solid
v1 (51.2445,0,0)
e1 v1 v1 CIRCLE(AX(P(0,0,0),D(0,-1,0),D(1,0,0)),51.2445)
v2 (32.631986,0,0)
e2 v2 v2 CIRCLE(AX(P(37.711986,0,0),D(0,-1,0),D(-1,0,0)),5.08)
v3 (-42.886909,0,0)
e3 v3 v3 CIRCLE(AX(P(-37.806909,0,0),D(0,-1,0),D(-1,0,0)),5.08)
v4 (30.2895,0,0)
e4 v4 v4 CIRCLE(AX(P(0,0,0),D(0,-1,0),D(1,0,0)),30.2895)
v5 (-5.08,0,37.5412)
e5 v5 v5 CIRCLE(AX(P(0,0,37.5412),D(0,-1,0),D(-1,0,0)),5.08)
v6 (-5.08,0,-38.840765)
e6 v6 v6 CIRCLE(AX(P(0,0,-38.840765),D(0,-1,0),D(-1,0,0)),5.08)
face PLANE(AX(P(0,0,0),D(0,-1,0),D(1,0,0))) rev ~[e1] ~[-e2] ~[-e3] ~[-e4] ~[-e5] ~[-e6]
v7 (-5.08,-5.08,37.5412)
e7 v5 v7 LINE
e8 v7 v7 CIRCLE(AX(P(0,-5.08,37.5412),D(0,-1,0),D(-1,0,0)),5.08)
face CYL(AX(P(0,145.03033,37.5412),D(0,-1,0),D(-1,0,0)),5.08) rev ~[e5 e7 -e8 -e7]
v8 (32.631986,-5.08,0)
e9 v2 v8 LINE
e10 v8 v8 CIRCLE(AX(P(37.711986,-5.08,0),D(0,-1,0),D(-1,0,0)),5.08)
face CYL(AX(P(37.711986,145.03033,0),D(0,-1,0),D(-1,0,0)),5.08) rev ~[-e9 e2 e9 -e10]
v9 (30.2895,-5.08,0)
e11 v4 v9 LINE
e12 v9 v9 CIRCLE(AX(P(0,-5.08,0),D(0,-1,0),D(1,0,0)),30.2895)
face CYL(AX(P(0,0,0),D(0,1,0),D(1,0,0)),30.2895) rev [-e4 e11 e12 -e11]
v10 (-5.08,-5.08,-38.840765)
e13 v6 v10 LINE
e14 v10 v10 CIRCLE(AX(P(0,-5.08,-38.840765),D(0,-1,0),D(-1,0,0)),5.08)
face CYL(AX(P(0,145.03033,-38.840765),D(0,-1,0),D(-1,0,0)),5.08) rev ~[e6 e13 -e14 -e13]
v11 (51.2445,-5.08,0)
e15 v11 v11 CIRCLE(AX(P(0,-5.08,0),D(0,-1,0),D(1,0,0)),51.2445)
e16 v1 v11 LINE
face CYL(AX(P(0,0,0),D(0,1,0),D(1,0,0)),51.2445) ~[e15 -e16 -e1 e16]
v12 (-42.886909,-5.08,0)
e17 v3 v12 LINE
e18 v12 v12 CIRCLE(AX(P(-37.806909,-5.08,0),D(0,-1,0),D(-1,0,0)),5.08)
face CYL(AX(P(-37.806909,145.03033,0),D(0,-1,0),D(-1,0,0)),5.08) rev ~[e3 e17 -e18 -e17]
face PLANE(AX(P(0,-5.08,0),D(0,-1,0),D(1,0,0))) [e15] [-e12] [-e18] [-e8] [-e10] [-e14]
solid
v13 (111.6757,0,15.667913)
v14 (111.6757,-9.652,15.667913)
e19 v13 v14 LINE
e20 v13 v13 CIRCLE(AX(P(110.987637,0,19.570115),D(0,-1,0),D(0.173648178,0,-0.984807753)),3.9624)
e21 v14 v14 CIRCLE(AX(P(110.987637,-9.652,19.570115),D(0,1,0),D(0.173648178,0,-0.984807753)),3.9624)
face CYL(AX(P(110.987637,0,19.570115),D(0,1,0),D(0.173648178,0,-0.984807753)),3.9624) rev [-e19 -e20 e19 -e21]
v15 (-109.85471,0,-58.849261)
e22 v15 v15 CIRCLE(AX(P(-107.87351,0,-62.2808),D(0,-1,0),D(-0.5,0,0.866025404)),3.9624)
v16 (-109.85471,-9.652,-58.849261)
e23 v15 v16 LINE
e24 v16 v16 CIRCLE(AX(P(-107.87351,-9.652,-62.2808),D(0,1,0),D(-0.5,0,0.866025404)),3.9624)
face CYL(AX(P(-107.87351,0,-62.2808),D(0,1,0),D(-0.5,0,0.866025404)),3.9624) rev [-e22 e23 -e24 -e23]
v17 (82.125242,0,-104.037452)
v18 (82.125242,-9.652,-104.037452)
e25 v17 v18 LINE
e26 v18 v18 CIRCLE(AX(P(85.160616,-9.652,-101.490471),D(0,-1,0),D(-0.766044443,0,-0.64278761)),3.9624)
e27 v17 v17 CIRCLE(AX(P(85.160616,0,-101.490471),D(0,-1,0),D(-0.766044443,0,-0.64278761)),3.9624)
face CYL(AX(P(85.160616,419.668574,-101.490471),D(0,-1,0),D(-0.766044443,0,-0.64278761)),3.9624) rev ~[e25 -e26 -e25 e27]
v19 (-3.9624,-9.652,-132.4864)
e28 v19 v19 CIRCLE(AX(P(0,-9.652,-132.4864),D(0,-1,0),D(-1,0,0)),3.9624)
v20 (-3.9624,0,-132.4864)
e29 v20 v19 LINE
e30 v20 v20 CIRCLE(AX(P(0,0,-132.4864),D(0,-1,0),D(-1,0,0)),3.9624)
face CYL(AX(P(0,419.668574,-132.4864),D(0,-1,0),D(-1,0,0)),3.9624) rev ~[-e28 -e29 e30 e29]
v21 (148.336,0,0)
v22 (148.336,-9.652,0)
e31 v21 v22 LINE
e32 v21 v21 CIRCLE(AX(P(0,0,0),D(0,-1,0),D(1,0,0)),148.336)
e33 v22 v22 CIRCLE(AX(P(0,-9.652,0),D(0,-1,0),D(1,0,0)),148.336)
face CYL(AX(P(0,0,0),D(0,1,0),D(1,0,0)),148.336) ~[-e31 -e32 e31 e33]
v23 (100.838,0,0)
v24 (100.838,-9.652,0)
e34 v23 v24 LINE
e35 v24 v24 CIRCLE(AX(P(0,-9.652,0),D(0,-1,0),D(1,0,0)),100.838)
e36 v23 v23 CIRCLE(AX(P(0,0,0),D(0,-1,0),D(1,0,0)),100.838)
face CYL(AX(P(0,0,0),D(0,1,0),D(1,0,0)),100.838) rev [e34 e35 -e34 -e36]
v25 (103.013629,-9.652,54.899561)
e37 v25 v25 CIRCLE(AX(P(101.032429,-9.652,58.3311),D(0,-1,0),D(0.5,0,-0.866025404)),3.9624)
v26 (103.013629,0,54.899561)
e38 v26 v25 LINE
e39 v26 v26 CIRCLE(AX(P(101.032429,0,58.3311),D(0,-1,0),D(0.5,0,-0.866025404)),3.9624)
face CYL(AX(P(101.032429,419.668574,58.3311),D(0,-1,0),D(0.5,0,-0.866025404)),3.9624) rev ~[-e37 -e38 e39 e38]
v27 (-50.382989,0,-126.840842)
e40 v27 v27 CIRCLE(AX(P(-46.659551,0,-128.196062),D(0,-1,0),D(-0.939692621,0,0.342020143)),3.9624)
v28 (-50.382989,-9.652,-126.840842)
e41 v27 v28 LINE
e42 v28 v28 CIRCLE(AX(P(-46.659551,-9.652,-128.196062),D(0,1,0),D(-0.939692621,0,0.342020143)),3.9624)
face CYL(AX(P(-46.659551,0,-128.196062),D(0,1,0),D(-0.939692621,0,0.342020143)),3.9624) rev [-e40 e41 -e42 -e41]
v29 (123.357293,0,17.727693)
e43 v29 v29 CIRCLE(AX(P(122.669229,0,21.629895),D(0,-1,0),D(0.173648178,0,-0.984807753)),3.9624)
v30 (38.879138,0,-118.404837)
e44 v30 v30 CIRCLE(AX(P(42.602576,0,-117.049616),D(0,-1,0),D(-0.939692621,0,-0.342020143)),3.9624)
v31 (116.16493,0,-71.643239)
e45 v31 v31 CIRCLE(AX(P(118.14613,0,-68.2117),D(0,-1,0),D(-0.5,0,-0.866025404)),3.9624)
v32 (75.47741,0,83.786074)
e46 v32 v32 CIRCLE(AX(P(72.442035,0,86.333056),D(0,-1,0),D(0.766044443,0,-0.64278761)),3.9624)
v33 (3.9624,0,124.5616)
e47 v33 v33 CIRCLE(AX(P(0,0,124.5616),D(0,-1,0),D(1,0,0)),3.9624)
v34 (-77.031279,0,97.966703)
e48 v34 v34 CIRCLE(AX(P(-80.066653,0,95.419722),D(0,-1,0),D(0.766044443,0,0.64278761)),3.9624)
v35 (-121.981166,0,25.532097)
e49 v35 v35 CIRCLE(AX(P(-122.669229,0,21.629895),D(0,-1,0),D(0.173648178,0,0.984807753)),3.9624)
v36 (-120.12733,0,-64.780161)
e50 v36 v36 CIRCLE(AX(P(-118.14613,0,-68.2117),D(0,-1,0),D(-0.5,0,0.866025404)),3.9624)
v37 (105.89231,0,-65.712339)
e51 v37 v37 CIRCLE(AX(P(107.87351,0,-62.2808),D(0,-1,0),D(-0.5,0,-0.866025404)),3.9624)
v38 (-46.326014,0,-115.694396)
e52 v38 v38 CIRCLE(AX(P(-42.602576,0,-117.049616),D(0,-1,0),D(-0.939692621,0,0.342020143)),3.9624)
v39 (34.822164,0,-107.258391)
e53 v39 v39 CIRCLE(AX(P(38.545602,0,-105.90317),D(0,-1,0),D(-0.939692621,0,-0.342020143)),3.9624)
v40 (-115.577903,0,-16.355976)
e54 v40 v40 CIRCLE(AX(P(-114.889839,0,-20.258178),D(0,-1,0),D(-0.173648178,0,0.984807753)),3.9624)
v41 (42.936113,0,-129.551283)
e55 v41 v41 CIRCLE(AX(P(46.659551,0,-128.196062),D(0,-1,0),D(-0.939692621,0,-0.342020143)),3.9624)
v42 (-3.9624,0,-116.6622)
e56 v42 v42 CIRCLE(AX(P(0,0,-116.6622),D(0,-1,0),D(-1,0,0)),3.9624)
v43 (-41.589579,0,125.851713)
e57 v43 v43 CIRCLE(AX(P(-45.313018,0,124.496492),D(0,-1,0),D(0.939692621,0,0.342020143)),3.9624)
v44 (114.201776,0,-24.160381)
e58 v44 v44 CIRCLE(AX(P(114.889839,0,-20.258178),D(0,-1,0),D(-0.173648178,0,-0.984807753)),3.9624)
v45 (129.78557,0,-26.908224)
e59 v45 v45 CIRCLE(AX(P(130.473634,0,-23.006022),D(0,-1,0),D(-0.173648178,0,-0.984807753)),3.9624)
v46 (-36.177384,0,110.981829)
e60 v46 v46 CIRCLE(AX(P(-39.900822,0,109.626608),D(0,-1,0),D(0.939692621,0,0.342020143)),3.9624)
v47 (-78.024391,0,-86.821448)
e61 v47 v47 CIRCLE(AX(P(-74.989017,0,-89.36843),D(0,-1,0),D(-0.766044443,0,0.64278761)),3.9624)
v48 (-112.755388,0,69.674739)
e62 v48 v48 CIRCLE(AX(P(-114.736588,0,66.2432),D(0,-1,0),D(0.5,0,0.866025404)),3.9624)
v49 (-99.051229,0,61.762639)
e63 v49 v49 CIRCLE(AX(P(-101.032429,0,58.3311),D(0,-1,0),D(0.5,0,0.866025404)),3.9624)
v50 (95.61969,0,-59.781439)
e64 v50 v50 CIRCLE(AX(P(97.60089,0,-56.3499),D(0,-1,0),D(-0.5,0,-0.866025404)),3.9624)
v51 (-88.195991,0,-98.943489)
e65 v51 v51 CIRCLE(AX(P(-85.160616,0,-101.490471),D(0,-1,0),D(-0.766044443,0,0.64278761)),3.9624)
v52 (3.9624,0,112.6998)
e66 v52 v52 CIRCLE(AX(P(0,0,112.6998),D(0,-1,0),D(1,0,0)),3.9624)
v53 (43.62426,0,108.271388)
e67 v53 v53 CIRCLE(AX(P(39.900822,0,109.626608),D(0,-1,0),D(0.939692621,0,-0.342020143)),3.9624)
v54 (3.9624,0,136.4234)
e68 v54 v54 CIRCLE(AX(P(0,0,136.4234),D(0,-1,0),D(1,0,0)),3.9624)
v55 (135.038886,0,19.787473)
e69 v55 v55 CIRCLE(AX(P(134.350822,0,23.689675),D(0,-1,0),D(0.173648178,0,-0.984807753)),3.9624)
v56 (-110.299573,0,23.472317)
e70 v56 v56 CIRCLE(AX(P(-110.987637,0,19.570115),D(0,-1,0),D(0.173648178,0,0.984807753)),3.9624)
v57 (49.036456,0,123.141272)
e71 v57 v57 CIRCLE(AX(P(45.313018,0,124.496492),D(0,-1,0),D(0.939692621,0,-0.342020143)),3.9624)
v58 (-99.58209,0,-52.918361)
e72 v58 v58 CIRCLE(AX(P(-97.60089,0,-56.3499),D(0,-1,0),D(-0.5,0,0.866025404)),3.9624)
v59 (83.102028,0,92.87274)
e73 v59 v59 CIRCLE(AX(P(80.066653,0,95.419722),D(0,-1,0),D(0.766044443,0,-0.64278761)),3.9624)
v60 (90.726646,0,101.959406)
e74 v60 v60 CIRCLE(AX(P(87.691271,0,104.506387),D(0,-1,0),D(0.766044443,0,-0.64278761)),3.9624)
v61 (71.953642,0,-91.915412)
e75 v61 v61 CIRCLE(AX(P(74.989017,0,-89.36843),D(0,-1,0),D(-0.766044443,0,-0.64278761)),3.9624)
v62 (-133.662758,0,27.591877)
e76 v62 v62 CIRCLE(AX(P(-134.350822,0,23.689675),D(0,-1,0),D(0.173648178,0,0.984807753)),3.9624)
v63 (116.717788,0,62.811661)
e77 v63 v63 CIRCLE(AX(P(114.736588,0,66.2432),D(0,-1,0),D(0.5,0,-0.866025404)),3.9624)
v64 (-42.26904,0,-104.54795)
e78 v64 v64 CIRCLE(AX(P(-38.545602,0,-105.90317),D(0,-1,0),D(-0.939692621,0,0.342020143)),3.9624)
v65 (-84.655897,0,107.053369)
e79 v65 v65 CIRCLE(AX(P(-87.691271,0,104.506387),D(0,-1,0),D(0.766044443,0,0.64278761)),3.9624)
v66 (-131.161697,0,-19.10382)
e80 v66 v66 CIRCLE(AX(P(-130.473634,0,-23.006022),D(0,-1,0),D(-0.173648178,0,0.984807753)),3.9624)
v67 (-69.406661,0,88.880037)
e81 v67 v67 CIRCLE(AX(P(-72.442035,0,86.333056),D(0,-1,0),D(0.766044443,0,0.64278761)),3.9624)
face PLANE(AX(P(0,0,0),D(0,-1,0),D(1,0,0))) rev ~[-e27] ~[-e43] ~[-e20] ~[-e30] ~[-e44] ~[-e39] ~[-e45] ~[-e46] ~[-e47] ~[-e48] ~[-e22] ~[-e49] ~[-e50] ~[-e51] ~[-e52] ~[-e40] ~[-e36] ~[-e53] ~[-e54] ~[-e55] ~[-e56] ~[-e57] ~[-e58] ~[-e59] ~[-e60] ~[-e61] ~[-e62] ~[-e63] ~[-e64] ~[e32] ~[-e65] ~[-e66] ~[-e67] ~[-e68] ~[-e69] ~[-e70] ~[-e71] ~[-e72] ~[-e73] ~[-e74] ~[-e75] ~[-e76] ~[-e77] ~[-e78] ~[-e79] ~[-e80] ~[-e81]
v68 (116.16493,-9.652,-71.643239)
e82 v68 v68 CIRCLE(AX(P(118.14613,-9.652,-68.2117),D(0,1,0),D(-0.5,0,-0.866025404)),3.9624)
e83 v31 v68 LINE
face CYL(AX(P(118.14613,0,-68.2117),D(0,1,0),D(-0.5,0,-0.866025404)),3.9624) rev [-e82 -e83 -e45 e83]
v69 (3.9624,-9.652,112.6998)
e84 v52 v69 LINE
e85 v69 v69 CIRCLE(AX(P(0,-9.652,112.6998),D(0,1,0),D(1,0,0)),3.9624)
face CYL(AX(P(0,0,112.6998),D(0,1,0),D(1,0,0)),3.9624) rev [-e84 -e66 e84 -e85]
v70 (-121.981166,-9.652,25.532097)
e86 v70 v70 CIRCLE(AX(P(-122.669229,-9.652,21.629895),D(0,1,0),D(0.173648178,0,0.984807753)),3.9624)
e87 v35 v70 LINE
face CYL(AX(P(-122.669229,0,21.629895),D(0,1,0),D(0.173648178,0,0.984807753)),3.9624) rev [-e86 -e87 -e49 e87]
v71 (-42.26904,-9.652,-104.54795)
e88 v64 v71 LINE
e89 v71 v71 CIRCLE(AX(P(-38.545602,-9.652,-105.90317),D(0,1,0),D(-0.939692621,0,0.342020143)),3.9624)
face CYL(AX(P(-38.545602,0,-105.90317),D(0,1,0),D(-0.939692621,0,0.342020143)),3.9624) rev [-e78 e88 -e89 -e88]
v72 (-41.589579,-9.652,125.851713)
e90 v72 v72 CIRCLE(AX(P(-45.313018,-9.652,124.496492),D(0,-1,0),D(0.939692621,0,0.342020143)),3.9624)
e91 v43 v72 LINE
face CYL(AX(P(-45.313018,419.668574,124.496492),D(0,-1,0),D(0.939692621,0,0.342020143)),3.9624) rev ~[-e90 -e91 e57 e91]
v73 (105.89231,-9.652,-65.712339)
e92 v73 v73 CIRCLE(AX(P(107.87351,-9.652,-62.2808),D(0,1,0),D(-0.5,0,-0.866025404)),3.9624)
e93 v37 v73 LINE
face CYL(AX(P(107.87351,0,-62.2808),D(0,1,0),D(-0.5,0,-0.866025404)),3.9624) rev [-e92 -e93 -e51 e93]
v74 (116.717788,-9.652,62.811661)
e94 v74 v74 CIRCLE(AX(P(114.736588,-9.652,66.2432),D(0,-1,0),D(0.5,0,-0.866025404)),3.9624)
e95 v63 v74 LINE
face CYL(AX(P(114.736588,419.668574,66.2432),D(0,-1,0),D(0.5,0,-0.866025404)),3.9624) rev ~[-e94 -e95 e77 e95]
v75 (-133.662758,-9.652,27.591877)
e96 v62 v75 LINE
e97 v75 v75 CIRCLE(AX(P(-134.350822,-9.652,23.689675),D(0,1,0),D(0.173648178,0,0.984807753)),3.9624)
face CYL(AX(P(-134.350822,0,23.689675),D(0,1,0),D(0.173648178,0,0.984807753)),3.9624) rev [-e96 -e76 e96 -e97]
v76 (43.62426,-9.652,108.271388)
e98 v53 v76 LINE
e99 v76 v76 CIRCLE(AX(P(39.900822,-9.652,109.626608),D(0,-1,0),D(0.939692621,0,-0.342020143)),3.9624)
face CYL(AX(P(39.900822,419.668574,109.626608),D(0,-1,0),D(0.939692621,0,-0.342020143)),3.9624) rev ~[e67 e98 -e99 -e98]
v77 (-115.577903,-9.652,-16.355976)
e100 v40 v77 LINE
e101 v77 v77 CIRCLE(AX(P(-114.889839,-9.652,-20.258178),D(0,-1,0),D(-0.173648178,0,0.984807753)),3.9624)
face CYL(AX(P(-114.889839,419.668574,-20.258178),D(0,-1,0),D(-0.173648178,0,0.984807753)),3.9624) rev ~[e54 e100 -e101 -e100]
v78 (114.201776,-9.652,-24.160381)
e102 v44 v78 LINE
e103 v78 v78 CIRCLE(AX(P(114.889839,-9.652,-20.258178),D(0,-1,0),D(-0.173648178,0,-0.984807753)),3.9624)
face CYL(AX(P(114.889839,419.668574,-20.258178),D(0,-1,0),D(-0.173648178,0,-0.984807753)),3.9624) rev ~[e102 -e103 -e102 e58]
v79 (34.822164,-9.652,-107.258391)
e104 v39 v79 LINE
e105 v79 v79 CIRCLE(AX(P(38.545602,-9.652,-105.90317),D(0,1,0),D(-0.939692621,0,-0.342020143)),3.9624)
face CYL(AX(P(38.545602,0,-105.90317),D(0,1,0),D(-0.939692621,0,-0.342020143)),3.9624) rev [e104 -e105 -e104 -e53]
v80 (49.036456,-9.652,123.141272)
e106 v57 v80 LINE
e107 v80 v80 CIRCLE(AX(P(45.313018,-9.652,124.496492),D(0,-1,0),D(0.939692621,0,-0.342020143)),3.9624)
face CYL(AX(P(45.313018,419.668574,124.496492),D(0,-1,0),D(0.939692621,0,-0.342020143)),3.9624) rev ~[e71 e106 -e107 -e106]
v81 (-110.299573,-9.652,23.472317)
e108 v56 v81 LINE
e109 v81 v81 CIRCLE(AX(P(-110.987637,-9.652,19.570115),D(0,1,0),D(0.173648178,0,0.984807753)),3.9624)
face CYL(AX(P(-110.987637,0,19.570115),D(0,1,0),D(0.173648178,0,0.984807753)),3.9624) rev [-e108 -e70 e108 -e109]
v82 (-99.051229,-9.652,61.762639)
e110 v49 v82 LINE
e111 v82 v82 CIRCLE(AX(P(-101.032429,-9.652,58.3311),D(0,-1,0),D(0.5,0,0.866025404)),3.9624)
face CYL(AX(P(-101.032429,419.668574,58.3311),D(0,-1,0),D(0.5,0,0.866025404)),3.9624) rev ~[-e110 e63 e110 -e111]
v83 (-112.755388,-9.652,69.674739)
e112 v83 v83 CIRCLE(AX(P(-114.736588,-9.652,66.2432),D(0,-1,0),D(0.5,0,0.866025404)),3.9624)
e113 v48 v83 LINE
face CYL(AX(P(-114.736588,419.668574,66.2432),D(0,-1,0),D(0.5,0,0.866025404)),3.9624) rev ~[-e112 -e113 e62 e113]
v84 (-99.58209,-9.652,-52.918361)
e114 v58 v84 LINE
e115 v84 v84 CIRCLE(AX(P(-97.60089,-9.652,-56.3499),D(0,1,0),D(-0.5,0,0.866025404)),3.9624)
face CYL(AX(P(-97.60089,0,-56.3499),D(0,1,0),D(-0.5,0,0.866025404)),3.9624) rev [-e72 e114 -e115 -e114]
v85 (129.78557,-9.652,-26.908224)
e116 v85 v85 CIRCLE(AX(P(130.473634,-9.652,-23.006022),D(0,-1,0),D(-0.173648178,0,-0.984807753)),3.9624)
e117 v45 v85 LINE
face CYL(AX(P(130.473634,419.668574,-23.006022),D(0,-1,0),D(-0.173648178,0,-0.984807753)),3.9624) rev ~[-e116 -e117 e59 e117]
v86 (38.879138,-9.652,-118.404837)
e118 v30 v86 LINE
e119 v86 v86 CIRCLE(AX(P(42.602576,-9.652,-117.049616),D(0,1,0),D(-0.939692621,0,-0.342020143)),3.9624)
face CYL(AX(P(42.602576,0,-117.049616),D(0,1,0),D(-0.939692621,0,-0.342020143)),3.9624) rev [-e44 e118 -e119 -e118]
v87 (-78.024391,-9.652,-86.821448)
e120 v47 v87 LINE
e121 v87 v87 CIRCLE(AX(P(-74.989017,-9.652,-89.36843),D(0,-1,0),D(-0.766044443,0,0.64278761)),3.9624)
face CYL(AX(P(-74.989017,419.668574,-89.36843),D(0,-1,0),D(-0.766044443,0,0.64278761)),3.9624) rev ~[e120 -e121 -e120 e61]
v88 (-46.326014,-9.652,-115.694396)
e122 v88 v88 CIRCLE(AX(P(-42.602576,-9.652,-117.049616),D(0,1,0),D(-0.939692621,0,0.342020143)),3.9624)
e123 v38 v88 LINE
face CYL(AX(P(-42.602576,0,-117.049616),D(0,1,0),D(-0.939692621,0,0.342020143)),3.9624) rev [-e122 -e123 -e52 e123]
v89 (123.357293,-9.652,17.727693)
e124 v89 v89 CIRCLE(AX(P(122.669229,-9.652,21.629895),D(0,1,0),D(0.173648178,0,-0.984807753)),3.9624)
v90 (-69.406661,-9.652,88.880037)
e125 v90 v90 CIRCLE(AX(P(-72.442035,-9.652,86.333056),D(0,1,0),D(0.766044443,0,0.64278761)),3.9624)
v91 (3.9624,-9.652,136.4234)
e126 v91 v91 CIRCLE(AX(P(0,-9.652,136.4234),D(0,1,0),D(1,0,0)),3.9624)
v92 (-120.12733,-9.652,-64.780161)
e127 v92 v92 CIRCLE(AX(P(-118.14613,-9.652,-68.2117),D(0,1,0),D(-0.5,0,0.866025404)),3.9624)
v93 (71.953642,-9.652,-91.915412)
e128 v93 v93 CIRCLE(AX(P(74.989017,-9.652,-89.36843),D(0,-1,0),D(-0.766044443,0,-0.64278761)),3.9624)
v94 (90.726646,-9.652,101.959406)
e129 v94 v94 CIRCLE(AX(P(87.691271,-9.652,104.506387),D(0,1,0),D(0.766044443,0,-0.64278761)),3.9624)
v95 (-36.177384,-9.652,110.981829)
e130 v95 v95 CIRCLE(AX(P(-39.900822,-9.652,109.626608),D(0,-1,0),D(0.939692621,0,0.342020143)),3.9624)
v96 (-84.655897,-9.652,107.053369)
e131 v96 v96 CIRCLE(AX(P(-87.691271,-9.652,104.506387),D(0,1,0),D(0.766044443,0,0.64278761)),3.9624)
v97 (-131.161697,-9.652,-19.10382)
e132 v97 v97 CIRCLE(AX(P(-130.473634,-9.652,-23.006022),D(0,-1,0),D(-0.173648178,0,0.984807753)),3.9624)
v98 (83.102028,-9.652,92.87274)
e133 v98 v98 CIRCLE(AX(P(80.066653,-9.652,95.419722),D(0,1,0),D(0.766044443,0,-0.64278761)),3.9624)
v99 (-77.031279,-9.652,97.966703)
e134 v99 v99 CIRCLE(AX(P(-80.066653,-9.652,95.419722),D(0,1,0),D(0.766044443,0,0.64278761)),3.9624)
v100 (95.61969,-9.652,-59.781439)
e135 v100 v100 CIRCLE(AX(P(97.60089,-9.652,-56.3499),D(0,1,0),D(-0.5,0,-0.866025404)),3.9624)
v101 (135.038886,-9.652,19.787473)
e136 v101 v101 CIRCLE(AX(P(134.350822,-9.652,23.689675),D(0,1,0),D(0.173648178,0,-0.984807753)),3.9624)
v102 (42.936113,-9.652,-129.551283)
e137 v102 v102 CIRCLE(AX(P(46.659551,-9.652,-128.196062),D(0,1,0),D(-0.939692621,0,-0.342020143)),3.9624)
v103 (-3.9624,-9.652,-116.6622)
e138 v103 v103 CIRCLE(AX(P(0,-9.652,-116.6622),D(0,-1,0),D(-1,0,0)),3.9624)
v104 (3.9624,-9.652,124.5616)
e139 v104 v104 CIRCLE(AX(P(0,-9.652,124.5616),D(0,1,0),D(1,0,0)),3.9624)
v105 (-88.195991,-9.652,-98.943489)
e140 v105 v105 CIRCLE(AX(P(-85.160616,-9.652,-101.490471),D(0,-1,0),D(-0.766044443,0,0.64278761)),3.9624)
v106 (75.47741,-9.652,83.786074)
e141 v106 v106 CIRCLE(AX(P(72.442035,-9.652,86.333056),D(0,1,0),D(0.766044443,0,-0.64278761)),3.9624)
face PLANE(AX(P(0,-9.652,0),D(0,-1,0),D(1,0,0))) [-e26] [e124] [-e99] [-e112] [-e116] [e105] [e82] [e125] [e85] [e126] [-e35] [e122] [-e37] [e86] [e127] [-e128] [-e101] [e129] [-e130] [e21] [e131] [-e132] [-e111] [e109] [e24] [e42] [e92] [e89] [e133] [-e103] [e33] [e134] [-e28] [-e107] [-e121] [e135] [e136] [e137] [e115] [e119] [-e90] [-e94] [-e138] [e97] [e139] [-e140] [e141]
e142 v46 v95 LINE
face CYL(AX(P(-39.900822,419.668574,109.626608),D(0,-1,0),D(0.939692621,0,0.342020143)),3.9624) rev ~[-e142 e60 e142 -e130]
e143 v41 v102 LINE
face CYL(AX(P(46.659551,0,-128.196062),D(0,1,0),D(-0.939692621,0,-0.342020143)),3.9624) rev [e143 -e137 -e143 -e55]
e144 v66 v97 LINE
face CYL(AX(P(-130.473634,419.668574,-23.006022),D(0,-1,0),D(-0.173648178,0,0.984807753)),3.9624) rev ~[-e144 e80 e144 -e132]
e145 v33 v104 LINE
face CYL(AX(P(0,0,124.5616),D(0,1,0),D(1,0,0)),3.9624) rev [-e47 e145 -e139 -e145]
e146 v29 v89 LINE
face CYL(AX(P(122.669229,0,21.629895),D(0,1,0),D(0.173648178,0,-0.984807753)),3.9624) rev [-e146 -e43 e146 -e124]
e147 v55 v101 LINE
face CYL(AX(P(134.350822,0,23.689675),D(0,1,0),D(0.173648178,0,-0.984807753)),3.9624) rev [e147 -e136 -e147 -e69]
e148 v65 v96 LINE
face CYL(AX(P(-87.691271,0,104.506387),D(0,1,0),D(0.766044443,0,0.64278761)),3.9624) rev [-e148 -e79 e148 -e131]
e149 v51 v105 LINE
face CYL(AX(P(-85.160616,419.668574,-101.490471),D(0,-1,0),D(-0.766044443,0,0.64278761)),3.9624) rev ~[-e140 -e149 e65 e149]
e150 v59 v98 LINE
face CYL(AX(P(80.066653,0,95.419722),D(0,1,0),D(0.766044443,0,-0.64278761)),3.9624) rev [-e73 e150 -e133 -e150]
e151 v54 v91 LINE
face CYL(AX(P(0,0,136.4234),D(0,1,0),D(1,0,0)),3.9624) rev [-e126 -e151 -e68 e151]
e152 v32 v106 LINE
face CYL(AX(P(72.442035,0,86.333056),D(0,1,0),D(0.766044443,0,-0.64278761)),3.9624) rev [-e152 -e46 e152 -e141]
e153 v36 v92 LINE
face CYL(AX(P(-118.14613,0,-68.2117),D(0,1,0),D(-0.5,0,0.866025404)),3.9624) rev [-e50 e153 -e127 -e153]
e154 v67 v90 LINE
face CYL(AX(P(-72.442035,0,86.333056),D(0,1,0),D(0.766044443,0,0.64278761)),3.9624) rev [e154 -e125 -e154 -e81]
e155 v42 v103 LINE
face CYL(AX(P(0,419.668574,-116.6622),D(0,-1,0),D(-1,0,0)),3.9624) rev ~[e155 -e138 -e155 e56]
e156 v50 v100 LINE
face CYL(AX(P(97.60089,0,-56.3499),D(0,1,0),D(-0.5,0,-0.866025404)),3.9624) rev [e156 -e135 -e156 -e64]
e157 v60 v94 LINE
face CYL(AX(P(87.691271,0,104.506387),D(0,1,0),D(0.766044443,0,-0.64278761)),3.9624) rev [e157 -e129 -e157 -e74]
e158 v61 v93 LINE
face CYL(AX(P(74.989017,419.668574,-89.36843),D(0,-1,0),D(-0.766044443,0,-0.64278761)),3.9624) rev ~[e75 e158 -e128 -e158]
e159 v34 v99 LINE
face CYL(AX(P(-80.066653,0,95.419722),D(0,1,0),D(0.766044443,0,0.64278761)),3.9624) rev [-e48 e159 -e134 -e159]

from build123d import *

# Parameters (mm, degrees)
F0_R            = 148.336
F0_R_2          = 100.838
F3_DEPTH        = 9.652
F2_R            = 3.9624
F4_DEPTH        = 9.653
F4_COPIES_COUNT = 9
F6_D            = 7.9248
F6_COPIES_COUNT = 9
F0_R_3          = 51.2445
F0_R_4          = 30.2895
F7_DEPTH        = 5.08
F8_D            = 10.16


# Not quite as in the source:
# - a pattern or mirror of a feature is missing from the dataset's text; its kind, count and spacing are read off the source's solid


with BuildPart() as f3:
    # F0 (on Front) → F3 (new body)
    with BuildSketch(Plane.XZ):
        Circle(F0_R)
        Circle(F0_R_2, mode=Mode.SUBTRACT)
    extrude(amount=F3_DEPTH)

    # F2 (on face) → F4 (cut, through all)
    with BuildSketch(Plane.XZ):
        with Locations((0, 112.6998)):
            Circle(F2_R)
        with Locations((0, 124.5616)):
            Circle(F2_R)
        with Locations((0, 136.4234)):
            Circle(F2_R)
    f4 = extrude(amount=F4_DEPTH, mode=Mode.SUBTRACT)

    # F4_copies: F4 ×9 about axis
    f4_copies_axis = Axis((0, 0, 0), (0, 1, 0))
    for i in range(1, F4_COPIES_COUNT):
        add(f4.rotate(f4_copies_axis, i * 360 / F4_COPIES_COUNT), mode=Mode.SUBTRACT)

    # F6 (through all)
    with Locations(Plane(origin=(0, 0, 0), x_dir=(1, 0, 0), z_dir=(0, 1, 0))):
        with Locations((0, 116.6622), (0, 132.4864)):
            f6 = Hole(F6_D / 2)

    # F6_copies: F6 ×9 about axis
    f6_copies_axis = Axis((0, 0, 0), (0, 1, 0))
    for i in range(1, F6_COPIES_COUNT):
        add(f6.rotate(f6_copies_axis, i * 360 / F6_COPIES_COUNT), mode=Mode.SUBTRACT)


with BuildPart() as f7:
    # F0 (on Front) → F7 (new body)
    with BuildSketch(Plane.XZ):
        Circle(F0_R_3)
        Circle(F0_R_4, mode=Mode.SUBTRACT)
    extrude(amount=F7_DEPTH)

    # F8 (through all)
    with Locations(Plane(origin=(0, 0, 0), x_dir=(1, 0, 0), z_dir=(0, 1, 0))):
        with Locations((0, -37.5412), (37.7119863628, 0), (0, 38.8407654956), (-37.8069085799, 0)):
            Hole(F8_D / 2)


solid = Compound([f3.part, f7.part])
